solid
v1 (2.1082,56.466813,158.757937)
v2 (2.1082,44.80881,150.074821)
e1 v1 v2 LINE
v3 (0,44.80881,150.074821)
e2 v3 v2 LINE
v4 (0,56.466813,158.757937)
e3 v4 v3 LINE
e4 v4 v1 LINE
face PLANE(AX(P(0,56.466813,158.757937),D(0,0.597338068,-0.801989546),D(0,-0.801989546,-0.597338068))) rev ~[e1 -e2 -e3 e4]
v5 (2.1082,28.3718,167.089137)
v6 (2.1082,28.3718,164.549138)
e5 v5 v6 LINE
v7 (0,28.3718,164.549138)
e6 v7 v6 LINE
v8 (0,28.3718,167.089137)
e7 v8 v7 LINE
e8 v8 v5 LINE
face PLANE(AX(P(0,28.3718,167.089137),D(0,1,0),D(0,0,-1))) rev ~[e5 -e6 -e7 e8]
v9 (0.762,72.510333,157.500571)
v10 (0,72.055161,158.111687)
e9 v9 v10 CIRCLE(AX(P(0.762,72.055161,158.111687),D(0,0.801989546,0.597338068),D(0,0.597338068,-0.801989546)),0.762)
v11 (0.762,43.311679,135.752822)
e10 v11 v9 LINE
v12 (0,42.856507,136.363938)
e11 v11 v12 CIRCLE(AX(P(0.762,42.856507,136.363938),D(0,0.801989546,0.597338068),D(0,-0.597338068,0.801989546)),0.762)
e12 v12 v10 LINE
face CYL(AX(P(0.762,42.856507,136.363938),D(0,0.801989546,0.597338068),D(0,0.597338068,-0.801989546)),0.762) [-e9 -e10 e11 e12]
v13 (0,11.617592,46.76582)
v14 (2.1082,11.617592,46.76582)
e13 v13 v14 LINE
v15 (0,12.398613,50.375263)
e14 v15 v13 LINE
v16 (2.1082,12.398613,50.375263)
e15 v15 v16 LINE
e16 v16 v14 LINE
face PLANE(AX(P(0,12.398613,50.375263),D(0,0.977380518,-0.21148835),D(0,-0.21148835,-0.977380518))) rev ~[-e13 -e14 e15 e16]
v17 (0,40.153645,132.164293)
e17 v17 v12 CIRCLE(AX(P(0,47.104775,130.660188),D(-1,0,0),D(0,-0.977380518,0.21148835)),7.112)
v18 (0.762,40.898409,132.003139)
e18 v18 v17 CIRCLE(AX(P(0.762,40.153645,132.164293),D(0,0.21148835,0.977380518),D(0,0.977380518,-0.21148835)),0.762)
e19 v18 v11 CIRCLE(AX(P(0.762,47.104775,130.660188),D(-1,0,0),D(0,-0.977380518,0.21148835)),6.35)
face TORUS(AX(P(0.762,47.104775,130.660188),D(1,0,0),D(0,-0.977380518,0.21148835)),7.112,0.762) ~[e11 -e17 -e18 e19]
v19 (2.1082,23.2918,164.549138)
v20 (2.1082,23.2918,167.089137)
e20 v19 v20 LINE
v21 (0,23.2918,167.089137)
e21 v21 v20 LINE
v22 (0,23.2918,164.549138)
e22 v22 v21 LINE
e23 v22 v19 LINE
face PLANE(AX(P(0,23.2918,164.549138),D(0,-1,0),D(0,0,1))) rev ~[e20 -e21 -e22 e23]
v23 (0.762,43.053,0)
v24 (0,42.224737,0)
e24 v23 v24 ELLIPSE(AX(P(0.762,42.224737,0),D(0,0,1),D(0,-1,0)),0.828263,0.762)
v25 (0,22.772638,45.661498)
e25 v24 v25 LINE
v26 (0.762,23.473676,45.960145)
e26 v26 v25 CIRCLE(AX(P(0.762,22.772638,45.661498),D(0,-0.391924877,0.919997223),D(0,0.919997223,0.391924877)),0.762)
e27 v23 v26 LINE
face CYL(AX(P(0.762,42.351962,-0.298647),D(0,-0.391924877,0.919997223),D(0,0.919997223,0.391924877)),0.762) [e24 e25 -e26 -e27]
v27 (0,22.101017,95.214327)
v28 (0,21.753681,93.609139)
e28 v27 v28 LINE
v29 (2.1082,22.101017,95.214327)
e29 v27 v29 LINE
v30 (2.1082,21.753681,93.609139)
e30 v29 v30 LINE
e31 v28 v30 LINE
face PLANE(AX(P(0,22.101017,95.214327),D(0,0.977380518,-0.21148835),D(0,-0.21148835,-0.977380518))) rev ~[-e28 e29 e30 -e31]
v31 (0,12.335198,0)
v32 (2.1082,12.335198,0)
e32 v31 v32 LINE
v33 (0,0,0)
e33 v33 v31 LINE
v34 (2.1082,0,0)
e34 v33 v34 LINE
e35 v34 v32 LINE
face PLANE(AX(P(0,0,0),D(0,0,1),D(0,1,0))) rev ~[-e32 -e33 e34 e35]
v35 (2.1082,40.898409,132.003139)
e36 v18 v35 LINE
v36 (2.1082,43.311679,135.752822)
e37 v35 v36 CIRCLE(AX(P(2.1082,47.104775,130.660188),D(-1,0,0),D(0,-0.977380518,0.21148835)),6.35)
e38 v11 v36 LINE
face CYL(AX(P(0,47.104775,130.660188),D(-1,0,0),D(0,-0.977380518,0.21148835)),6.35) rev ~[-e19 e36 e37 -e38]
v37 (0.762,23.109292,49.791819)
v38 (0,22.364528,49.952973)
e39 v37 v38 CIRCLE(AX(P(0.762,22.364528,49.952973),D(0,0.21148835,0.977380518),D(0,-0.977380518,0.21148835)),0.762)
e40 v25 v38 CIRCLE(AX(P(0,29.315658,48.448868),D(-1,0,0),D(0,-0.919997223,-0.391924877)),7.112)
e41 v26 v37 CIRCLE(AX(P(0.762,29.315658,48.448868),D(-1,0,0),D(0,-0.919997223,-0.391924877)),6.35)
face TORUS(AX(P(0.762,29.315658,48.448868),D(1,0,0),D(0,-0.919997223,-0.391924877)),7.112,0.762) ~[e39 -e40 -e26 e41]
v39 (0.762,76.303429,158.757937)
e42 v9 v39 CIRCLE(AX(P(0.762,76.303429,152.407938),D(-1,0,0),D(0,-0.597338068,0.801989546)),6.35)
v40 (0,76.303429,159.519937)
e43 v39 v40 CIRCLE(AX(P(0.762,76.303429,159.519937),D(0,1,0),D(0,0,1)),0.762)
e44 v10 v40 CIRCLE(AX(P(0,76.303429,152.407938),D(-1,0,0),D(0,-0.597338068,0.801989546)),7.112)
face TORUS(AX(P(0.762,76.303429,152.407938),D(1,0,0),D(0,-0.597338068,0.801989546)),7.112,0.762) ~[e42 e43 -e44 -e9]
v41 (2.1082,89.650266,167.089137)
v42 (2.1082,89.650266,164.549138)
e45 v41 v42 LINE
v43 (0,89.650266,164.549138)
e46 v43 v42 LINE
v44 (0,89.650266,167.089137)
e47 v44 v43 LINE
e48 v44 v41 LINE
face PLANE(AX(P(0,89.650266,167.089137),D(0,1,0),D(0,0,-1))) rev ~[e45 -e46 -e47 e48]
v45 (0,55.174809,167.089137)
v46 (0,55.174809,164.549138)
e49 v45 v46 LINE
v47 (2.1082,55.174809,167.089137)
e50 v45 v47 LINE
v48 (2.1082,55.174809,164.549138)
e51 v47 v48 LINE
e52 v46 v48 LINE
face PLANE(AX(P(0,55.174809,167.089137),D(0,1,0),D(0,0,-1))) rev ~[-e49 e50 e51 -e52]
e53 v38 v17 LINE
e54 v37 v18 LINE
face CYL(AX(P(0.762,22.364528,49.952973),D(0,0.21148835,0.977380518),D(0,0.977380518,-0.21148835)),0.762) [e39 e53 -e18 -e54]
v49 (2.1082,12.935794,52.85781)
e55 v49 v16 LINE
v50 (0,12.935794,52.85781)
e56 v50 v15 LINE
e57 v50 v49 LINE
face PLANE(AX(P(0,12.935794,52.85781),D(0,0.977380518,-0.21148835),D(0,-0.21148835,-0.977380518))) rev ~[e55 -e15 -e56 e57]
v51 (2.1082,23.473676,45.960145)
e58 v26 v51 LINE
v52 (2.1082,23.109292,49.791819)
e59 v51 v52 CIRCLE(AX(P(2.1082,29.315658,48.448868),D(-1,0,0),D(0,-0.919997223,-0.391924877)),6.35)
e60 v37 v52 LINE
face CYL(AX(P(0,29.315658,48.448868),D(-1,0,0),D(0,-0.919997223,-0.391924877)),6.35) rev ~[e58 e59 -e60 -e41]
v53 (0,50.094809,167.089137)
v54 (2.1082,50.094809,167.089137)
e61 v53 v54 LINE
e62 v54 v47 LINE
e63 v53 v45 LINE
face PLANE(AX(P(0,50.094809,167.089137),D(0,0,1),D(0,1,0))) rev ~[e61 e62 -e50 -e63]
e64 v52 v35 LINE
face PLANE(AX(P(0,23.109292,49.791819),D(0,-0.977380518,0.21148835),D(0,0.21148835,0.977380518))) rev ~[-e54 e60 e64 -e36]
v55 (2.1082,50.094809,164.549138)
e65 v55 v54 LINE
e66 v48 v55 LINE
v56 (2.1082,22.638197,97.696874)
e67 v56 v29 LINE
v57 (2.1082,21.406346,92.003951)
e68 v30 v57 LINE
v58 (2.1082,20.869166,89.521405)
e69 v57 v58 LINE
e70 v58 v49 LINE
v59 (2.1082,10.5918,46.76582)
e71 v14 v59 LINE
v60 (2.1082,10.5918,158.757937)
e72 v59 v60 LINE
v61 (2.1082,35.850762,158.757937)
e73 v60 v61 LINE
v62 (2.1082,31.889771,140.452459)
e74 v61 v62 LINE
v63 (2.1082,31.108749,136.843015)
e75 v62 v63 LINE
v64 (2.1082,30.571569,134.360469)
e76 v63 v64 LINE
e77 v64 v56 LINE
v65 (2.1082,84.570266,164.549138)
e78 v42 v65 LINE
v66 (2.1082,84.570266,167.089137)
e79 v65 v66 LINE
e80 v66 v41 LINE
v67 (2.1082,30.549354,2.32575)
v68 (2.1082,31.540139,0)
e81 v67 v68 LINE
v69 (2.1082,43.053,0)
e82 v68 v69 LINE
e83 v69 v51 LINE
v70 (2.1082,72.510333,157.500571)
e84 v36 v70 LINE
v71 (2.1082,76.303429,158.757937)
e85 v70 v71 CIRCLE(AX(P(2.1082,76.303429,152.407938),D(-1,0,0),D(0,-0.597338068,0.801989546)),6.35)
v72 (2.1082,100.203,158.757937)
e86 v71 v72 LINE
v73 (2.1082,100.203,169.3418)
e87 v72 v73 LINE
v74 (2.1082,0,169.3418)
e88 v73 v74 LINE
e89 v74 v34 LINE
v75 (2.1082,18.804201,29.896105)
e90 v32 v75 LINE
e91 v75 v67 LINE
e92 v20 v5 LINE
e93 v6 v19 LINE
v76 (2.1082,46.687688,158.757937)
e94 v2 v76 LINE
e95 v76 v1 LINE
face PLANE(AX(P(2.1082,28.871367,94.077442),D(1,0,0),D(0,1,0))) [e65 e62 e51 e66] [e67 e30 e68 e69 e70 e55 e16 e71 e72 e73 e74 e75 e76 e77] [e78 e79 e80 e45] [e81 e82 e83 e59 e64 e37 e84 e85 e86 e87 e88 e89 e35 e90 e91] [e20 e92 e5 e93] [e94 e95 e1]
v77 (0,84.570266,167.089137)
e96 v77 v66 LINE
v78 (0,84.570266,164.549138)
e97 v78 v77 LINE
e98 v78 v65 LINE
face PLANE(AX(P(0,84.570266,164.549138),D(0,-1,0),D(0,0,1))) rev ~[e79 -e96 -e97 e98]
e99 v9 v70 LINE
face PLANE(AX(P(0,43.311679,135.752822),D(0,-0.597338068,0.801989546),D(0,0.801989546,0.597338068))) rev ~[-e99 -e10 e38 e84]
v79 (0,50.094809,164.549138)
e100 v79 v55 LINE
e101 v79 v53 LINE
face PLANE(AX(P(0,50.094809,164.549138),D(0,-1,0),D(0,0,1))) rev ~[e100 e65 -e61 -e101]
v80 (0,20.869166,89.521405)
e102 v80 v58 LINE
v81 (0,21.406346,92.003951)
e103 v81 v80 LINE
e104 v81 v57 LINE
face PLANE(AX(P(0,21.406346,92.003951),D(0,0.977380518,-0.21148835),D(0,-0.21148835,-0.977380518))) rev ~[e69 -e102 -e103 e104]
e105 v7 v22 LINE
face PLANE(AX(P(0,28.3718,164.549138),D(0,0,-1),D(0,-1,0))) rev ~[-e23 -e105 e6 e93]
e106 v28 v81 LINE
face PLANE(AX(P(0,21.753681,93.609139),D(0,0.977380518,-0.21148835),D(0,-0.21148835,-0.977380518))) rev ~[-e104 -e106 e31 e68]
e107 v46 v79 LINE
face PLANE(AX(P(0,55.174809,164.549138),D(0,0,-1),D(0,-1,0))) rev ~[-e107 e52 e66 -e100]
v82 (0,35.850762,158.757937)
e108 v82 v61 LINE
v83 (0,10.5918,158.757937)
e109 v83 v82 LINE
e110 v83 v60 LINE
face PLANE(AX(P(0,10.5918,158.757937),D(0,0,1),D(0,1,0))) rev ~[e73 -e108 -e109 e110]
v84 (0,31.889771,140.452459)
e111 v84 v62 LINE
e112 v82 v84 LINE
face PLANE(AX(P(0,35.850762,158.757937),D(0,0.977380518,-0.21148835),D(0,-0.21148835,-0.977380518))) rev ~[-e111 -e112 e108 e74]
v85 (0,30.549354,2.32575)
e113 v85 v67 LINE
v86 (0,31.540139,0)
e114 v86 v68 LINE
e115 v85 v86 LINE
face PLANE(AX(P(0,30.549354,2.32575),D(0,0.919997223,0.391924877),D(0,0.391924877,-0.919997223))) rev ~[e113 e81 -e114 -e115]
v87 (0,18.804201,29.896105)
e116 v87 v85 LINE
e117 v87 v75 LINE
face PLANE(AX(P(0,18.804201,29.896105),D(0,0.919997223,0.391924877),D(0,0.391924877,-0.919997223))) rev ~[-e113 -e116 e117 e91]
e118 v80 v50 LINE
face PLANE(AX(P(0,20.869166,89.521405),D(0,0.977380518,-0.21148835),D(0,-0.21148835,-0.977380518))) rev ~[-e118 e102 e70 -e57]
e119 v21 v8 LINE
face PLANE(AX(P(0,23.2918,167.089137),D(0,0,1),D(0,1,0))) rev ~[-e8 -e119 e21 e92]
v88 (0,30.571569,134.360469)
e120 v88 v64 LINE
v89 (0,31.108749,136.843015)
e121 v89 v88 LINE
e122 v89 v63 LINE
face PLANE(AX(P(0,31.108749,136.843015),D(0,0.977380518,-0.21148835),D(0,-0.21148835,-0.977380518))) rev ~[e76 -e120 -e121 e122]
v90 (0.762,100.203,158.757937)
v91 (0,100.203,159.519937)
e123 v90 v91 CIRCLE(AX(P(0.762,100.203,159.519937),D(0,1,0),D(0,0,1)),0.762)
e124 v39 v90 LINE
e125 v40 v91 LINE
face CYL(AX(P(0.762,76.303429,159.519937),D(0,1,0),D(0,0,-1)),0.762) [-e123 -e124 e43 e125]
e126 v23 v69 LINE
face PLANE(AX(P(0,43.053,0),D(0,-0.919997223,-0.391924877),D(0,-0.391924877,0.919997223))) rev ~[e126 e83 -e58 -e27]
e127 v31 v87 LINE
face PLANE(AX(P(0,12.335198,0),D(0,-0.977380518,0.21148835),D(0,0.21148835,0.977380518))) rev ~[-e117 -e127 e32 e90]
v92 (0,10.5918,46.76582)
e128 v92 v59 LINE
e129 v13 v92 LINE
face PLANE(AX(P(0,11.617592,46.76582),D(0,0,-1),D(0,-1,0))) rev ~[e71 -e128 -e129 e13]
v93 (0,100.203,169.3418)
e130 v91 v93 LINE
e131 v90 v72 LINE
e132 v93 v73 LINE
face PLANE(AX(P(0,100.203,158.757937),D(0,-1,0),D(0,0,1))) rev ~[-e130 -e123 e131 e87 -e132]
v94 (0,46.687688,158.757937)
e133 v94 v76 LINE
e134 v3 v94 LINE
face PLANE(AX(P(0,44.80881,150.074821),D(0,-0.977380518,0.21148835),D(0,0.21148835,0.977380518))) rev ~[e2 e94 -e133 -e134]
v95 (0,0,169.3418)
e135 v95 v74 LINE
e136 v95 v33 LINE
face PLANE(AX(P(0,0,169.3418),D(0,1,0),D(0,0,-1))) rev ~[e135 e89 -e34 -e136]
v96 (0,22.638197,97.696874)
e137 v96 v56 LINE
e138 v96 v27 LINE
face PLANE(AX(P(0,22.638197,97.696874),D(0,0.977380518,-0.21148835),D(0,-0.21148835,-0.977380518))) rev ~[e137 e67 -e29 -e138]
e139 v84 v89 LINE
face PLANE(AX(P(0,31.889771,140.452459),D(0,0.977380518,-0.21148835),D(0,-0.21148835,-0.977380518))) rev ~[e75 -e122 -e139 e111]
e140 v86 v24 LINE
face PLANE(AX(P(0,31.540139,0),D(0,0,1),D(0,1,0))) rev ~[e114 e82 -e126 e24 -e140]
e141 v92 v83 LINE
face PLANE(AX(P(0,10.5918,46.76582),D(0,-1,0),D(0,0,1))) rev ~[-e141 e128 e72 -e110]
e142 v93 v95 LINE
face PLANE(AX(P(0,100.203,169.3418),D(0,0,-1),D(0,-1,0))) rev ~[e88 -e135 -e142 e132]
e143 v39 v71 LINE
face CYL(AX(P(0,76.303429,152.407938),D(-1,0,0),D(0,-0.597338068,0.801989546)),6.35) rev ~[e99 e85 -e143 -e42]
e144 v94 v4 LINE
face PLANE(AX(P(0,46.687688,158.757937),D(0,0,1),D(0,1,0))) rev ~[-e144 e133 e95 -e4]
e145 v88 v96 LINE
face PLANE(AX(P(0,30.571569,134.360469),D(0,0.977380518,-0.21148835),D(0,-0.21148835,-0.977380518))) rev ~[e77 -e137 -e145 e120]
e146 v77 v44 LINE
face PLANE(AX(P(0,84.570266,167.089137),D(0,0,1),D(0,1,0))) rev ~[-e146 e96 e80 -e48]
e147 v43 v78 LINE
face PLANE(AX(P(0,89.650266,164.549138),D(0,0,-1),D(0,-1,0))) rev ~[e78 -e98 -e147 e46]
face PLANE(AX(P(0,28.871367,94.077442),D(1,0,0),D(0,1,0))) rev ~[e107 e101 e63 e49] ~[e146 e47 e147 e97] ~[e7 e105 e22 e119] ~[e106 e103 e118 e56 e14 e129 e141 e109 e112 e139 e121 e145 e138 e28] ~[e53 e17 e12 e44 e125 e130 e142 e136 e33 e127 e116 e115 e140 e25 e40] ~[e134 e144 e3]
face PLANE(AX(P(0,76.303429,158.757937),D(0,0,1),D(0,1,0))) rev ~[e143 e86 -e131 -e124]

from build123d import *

# Parameters (mm, degrees)
F1_DEPTH = 2.1082
F2_R     = 0.762


# Not quite as in the source:
# - a feature names something its author has since deleted; it is built from what else it names


with BuildPart() as f1:
    # F0 (on Right) → F1 (new body)
    with BuildSketch(Plane.YZ):
        with BuildLine():
            Line((0, 169.3418), (0, 0))
            Line((0, 0), (12.335197777, 0))
            Line((12.335197777, 0), (18.8042013144, 29.896105485))
            Line((18.8042013144, 29.896105485), (30.5493542935, 2.3257501254))
            Line((30.5493542935, 2.3257501254), (31.5401391658, 0))
            Line((31.5401391658, 0), (31.5707651968, 0))
            Line((31.5707651968, 0), (40.8442968098, 0))
            Line((40.8442968098, 0), (20.5594925834, 47.616175108))
            Line((20.5594925834, 47.616175108), (39.5771112022, 135.5049402038))
            Line((39.5771112022, 135.5049402038), (73.5248959406, 160.7899383022))
            Line((73.5248959406, 160.7899383022), (100.203, 160.7899383022))
            Line((100.203, 160.7899383022), (100.203, 162.0091375))
            Line((100.203, 162.0091375), (82.1398573303, 162.0091375))
            ThreePointArc((82.1398573303, 162.0091375), (80.3438061061, 162.7530862758), (79.5998573303, 164.5491375))
            Line((79.5998573303, 164.5491375), (79.5998573303, 169.3418))
            Line((79.5998573303, 169.3418), (70.6874244764, 169.3418))
            Line((70.6874244764, 169.3418), (70.6874244764, 165.8480664454))
            Line((70.6874244764, 165.8480664454), (70.6874244764, 164.5491375))
            ThreePointArc((70.6874244764, 164.5491375), (70.0510915867, 162.8675752701), (68.4609272063, 162.0285589874))
            ThreePointArc((68.4609272063, 162.0285589874), (68.3044763435, 162.0139975214), (68.1474244764, 162.0091375))
            Line((68.1474244764, 162.0091375), (18.2118, 162.0091375))
            ThreePointArc((18.2118, 162.0091375), (16.4157487758, 162.7530862758), (15.6718, 164.5491375))
            Line((15.6718, 164.5491375), (15.6718, 169.3418))
            Line((15.6718, 169.3418), (0, 169.3418))
        make_face()
        Polygon((21.4843682503, 35.8535070154), (23.4753466245, 31.1799211209), (21.1385536773, 30.1844319338), (19.147575303, 34.8580178283), align=None, mode=Mode.SUBTRACT)
        Polygon((25.8665425285, 25.5668719827), (27.8575209028, 20.8932860882), (25.5207279555, 19.8977969011), (23.5297495813, 24.5713827956), align=None, mode=Mode.SUBTRACT)
        with BuildLine():
            Line((12.3986134924, 50.3752630702), (11.6175919588, 46.7658196656))
            Line((11.6175919588, 46.7658196656), (10.5918, 46.7658196656))
            Line((10.5918, 46.7658196656), (10.5918, 158.7579375))
            Line((10.5918, 158.7579375), (35.8507619547, 158.7579375))
            Line((35.8507619547, 158.7579375), (31.8897708968, 140.4524587956))
            Line((31.8897708968, 140.4524587956), (31.1087493632, 136.8430153909))
            Line((31.1087493632, 136.8430153909), (35.5475592049, 135.882533211))
            ThreePointArc((35.5475592049, 135.882533211), (37.1456481821, 134.7755682604), (37.4929253116, 132.8628062845))
            Line((37.4929253116, 132.8628062845), (29.5595533377, 96.1992113407))
            ThreePointArc((29.5595533377, 96.1992113407), (28.452588387, 94.6011223635), (26.5398264112, 94.2538452339))
            Line((26.5398264112, 94.2538452339), (22.1010165695, 95.2143274138))
            Line((22.1010165695, 95.2143274138), (21.7536814278, 93.6091392306))
            Line((21.7536814278, 93.6091392306), (21.4063462861, 92.0039510473))
            Line((21.4063462861, 92.0039510473), (25.8451561277, 91.0434688674))
            ThreePointArc((25.8451561277, 91.0434688674), (27.4432451049, 89.9365039168), (27.7905222345, 88.0237419409))
            Line((27.7905222345, 88.0237419409), (19.8571502605, 51.3601469971))
            ThreePointArc((19.8571502605, 51.3601469971), (18.7501853099, 49.7620580199), (16.837423334, 49.4147808903))
            Line((16.837423334, 49.4147808903), (12.3986134924, 50.3752630702))
        make_face(mode=Mode.SUBTRACT)
        Polygon((47.0613097153, 149.2568137468), (48.5785484084, 147.2197602993), (44.5044415132, 144.1852829132), (42.9872028202, 146.2223363607), align=None, mode=Mode.SUBTRACT)
        Polygon((44.8088104432, 150.074821282), (46.6876875952, 158.7579375), (56.4668125154, 158.7579375), align=None, mode=Mode.SUBTRACT)
        Polygon((63.2751536106, 161.3332132886), (64.7923923036, 159.296159841), (60.7182854085, 156.2616824549), (59.2010467154, 158.2987359025), align=None, mode=Mode.SUBTRACT)
        with BuildLine():
            Line((20.5594925834, 47.616175108), (40.8442968098, 0))
            Line((40.8442968098, 0), (43.053, 0))
            Line((43.053, 0), (23.4736756901, 45.9601445708))
            ThreePointArc((23.4736756901, 45.9601445708), (22.9941781878, 47.847708452), (23.1092917667, 49.7918185633))
            Line((23.1092917667, 49.7918185633), (40.8984089502, 132.0031391675))
            ThreePointArc((40.8984089502, 132.0031391675), (41.765080018, 134.0967787378), (43.3116785091, 135.7528217618))
            Line((43.3116785091, 135.7528217618), (72.5103326221, 157.500571119))
            ThreePointArc((72.5103326221, 157.500571119), (74.3053957564, 158.4354047741), (76.3034293547, 158.7579375))
            Line((76.3034293547, 158.7579375), (100.203, 158.7579375))
            Line((100.203, 158.7579375), (100.203, 160.7899383022))
            Line((100.203, 160.7899383022), (73.5248959406, 160.7899383022))
            Line((73.5248959406, 160.7899383022), (39.5771112022, 135.5049402038))
            Line((39.5771112022, 135.5049402038), (20.5594925834, 47.616175108))
        make_face()
        Polygon((68.1474244764, 169.3418), (18.2118, 169.3418), (18.2118, 164.5491375), (23.2918, 164.5491375), (23.2918, 167.0891375), (28.3718, 167.0891375), (28.3718, 164.5491375), (50.0948093832, 164.5491375), (50.0948093832, 167.0891375), (55.1748093832, 167.0891375), (55.1748093832, 164.5491375), (68.1474244764, 164.5491375), (68.1474244764, 165.0060867035), align=None)
        with BuildLine():
            Line((18.2118, 169.3418), (15.6718, 169.3418))
            Line((15.6718, 169.3418), (15.6718, 164.5491375))
            ThreePointArc((15.6718, 164.5491375), (16.4157487758, 162.7530862758), (18.2118, 162.0091375))
            Line((18.2118, 162.0091375), (68.1474244764, 162.0091375))
            ThreePointArc((68.1474244764, 162.0091375), (68.3044763435, 162.0139975214), (68.4609272063, 162.0285589874))
            Line((68.4609272063, 162.0285589874), (69.6856973646, 162.9407926238))
            Line((69.6856973646, 162.9407926238), (68.1474244764, 165.0060867035))
            Line((68.1474244764, 165.0060867035), (68.1474244764, 164.5491375))
            Line((68.1474244764, 164.5491375), (55.1748093832, 164.5491375))
            Line((55.1748093832, 164.5491375), (50.0948093832, 164.5491375))
            Line((50.0948093832, 164.5491375), (28.3718, 164.5491375))
            Line((28.3718, 164.5491375), (23.2918, 164.5491375))
            Line((23.2918, 164.5491375), (18.2118, 164.5491375))
            Line((18.2118, 164.5491375), (18.2118, 169.3418))
        make_face()
        Polygon((20.8691658762, 89.5214045307), (12.9357939022, 52.8578095868), (17.3746037439, 51.8973274069), (18.6675621562, 57.872655888), (16.1850156395, 58.4098362979), (17.2593764593, 63.3749293312), (19.7419229759, 62.8377489213), (22.9432277355, 77.6323837102), (20.4606812189, 78.16956412), (21.5350420386, 83.1346571533), (24.0175885553, 82.5974767434), (25.3079757178, 88.5609223508), align=None)
        Polygon((35.010378795, 133.3999866944), (30.5715689534, 134.3604688743), (22.6381969794, 97.6968739305), (27.077006821, 96.7363917505), (28.3673939836, 102.6998373579), (25.884847467, 103.2370177677), (26.9592082867, 108.202110801), (29.4417548033, 107.6649303911), (32.643059563, 122.45956518), (30.1605130463, 122.9967455899), (31.2348738661, 127.9618386231), (33.7174203827, 127.4246582133), align=None)
        with BuildLine():
            Line((12.9357939022, 52.8578095868), (12.3986134924, 50.3752630702))
            Line((12.3986134924, 50.3752630702), (16.837423334, 49.4147808903))
            ThreePointArc((16.837423334, 49.4147808903), (18.7501853099, 49.7620580199), (19.8571502605, 51.3601469971))
            Line((19.8571502605, 51.3601469971), (27.7905222345, 88.0237419409))
            ThreePointArc((27.7905222345, 88.0237419409), (27.4432451049, 89.9365039168), (25.8451561277, 91.0434688674))
            Line((25.8451561277, 91.0434688674), (21.4063462861, 92.0039510473))
            Line((21.4063462861, 92.0039510473), (20.8691658762, 89.5214045307))
            Line((20.8691658762, 89.5214045307), (25.3079757178, 88.5609223508))
            Line((25.3079757178, 88.5609223508), (24.0175885553, 82.5974767434))
            Line((24.0175885553, 82.5974767434), (22.9432277355, 77.6323837102))
            Line((22.9432277355, 77.6323837102), (19.7419229759, 62.8377489213))
            Line((19.7419229759, 62.8377489213), (18.6675621562, 57.872655888))
            Line((18.6675621562, 57.872655888), (17.3746037439, 51.8973274069))
            Line((17.3746037439, 51.8973274069), (12.9357939022, 52.8578095868))
        make_face()
        with BuildLine():
            Line((35.5475592049, 135.882533211), (31.1087493632, 136.8430153909))
            Line((31.1087493632, 136.8430153909), (30.5715689534, 134.3604688743))
            Line((30.5715689534, 134.3604688743), (35.010378795, 133.3999866944))
            Line((35.010378795, 133.3999866944), (33.7174203827, 127.4246582133))
            Line((33.7174203827, 127.4246582133), (32.643059563, 122.45956518))
            Line((32.643059563, 122.45956518), (29.4417548033, 107.6649303911))
            Line((29.4417548033, 107.6649303911), (28.3673939836, 102.6998373579))
            Line((28.3673939836, 102.6998373579), (27.077006821, 96.7363917505))
            Line((27.077006821, 96.7363917505), (22.6381969794, 97.6968739305))
            Line((22.6381969794, 97.6968739305), (22.1010165695, 95.2143274138))
            Line((22.1010165695, 95.2143274138), (26.5398264112, 94.2538452339))
            ThreePointArc((26.5398264112, 94.2538452339), (28.452588387, 94.6011223635), (29.5595533377, 96.1992113407))
            Line((29.5595533377, 96.1992113407), (37.4929253116, 132.8628062845))
            ThreePointArc((37.4929253116, 132.8628062845), (37.1456481821, 134.7755682604), (35.5475592049, 135.882533211))
        make_face()
        Polygon((100.203, 169.3418), (82.1398573303, 169.3418), (82.1398573303, 164.5491375), (84.5702663064, 164.5491375), (84.5702663064, 167.0891375), (89.6502663064, 167.0891375), (89.6502663064, 164.5491375), (100.203, 164.5491375), align=None)
        with BuildLine():
            Line((82.1398573303, 169.3418), (79.5998573303, 169.3418))
            Line((79.5998573303, 169.3418), (79.5998573303, 164.5491375))
            ThreePointArc((79.5998573303, 164.5491375), (80.3438061061, 162.7530862758), (82.1398573303, 162.0091375))
            Line((82.1398573303, 162.0091375), (100.203, 162.0091375))
            Line((100.203, 162.0091375), (100.203, 164.5491375))
            Line((100.203, 164.5491375), (89.6502663064, 164.5491375))
            Line((89.6502663064, 164.5491375), (84.5702663064, 164.5491375))
            Line((84.5702663064, 164.5491375), (82.1398573303, 164.5491375))
            Line((82.1398573303, 164.5491375), (82.1398573303, 169.3418))
        make_face()
        with BuildLine():
            Line((70.6874244764, 169.3418), (68.1474244764, 169.3418))
            Line((68.1474244764, 169.3418), (68.1474244764, 165.0060867035))
            Line((68.1474244764, 165.0060867035), (69.6856973646, 162.9407926238))
            Line((69.6856973646, 162.9407926238), (68.4609272063, 162.0285589874))
            ThreePointArc((68.4609272063, 162.0285589874), (70.0510915867, 162.8675752701), (70.6874244764, 164.5491375))
            Line((70.6874244764, 164.5491375), (70.6874244764, 165.8480664454))
            Line((70.6874244764, 165.8480664454), (70.6874244764, 169.3418))
        make_face()
        Polygon((21.1385536773, 30.1844319338), (23.4753466245, 31.1799211209), (21.4843682503, 35.8535070154), (19.147575303, 34.8580178283), align=None)
        Polygon((25.5207279555, 19.8977969011), (27.8575209028, 20.8932860882), (25.8665425285, 25.5668719827), (23.5297495813, 24.5713827956), align=None)
        Polygon((44.5044415132, 144.1852829132), (48.5785484084, 147.2197602993), (47.0613097153, 149.2568137468), (42.9872028202, 146.2223363607), align=None)
        Polygon((60.7182854085, 156.2616824549), (64.7923923036, 159.296159841), (63.2751536106, 161.3332132886), (59.2010467154, 158.2987359025), align=None)
        Polygon((16.1850156395, 58.4098362979), (18.6675621562, 57.872655888), (19.7419229759, 62.8377489213), (17.2593764593, 63.3749293312), align=None)
        Polygon((22.9432277355, 77.6323837102), (24.0175885553, 82.5974767434), (21.5350420386, 83.1346571533), (20.4606812189, 78.16956412), align=None)
        Polygon((32.643059563, 122.45956518), (33.7174203827, 127.4246582133), (31.2348738661, 127.9618386231), (30.1605130463, 122.9967455899), align=None)
        Polygon((25.884847467, 103.2370177677), (28.3673939836, 102.6998373579), (29.4417548033, 107.6649303911), (26.9592082867, 108.202110801), align=None)
    extrude(amount=F1_DEPTH)

    # F2
    f2_edges = [f1.edges().sort_by_distance(p)[0] for p in [
        (0, 32.00385, 90.897479),
        (0, 33.263338, 22.980072),
        (0, 22.994178, 47.847708),
        (0, 41.76508, 134.096779),
        (0, 57.911006, 146.626696),
        (0, 74.305396, 158.435405),
        (0, 88.253215, 158.757937),
    ]]
    fillet(f2_edges, radius=F2_R)


solid = f1.part
